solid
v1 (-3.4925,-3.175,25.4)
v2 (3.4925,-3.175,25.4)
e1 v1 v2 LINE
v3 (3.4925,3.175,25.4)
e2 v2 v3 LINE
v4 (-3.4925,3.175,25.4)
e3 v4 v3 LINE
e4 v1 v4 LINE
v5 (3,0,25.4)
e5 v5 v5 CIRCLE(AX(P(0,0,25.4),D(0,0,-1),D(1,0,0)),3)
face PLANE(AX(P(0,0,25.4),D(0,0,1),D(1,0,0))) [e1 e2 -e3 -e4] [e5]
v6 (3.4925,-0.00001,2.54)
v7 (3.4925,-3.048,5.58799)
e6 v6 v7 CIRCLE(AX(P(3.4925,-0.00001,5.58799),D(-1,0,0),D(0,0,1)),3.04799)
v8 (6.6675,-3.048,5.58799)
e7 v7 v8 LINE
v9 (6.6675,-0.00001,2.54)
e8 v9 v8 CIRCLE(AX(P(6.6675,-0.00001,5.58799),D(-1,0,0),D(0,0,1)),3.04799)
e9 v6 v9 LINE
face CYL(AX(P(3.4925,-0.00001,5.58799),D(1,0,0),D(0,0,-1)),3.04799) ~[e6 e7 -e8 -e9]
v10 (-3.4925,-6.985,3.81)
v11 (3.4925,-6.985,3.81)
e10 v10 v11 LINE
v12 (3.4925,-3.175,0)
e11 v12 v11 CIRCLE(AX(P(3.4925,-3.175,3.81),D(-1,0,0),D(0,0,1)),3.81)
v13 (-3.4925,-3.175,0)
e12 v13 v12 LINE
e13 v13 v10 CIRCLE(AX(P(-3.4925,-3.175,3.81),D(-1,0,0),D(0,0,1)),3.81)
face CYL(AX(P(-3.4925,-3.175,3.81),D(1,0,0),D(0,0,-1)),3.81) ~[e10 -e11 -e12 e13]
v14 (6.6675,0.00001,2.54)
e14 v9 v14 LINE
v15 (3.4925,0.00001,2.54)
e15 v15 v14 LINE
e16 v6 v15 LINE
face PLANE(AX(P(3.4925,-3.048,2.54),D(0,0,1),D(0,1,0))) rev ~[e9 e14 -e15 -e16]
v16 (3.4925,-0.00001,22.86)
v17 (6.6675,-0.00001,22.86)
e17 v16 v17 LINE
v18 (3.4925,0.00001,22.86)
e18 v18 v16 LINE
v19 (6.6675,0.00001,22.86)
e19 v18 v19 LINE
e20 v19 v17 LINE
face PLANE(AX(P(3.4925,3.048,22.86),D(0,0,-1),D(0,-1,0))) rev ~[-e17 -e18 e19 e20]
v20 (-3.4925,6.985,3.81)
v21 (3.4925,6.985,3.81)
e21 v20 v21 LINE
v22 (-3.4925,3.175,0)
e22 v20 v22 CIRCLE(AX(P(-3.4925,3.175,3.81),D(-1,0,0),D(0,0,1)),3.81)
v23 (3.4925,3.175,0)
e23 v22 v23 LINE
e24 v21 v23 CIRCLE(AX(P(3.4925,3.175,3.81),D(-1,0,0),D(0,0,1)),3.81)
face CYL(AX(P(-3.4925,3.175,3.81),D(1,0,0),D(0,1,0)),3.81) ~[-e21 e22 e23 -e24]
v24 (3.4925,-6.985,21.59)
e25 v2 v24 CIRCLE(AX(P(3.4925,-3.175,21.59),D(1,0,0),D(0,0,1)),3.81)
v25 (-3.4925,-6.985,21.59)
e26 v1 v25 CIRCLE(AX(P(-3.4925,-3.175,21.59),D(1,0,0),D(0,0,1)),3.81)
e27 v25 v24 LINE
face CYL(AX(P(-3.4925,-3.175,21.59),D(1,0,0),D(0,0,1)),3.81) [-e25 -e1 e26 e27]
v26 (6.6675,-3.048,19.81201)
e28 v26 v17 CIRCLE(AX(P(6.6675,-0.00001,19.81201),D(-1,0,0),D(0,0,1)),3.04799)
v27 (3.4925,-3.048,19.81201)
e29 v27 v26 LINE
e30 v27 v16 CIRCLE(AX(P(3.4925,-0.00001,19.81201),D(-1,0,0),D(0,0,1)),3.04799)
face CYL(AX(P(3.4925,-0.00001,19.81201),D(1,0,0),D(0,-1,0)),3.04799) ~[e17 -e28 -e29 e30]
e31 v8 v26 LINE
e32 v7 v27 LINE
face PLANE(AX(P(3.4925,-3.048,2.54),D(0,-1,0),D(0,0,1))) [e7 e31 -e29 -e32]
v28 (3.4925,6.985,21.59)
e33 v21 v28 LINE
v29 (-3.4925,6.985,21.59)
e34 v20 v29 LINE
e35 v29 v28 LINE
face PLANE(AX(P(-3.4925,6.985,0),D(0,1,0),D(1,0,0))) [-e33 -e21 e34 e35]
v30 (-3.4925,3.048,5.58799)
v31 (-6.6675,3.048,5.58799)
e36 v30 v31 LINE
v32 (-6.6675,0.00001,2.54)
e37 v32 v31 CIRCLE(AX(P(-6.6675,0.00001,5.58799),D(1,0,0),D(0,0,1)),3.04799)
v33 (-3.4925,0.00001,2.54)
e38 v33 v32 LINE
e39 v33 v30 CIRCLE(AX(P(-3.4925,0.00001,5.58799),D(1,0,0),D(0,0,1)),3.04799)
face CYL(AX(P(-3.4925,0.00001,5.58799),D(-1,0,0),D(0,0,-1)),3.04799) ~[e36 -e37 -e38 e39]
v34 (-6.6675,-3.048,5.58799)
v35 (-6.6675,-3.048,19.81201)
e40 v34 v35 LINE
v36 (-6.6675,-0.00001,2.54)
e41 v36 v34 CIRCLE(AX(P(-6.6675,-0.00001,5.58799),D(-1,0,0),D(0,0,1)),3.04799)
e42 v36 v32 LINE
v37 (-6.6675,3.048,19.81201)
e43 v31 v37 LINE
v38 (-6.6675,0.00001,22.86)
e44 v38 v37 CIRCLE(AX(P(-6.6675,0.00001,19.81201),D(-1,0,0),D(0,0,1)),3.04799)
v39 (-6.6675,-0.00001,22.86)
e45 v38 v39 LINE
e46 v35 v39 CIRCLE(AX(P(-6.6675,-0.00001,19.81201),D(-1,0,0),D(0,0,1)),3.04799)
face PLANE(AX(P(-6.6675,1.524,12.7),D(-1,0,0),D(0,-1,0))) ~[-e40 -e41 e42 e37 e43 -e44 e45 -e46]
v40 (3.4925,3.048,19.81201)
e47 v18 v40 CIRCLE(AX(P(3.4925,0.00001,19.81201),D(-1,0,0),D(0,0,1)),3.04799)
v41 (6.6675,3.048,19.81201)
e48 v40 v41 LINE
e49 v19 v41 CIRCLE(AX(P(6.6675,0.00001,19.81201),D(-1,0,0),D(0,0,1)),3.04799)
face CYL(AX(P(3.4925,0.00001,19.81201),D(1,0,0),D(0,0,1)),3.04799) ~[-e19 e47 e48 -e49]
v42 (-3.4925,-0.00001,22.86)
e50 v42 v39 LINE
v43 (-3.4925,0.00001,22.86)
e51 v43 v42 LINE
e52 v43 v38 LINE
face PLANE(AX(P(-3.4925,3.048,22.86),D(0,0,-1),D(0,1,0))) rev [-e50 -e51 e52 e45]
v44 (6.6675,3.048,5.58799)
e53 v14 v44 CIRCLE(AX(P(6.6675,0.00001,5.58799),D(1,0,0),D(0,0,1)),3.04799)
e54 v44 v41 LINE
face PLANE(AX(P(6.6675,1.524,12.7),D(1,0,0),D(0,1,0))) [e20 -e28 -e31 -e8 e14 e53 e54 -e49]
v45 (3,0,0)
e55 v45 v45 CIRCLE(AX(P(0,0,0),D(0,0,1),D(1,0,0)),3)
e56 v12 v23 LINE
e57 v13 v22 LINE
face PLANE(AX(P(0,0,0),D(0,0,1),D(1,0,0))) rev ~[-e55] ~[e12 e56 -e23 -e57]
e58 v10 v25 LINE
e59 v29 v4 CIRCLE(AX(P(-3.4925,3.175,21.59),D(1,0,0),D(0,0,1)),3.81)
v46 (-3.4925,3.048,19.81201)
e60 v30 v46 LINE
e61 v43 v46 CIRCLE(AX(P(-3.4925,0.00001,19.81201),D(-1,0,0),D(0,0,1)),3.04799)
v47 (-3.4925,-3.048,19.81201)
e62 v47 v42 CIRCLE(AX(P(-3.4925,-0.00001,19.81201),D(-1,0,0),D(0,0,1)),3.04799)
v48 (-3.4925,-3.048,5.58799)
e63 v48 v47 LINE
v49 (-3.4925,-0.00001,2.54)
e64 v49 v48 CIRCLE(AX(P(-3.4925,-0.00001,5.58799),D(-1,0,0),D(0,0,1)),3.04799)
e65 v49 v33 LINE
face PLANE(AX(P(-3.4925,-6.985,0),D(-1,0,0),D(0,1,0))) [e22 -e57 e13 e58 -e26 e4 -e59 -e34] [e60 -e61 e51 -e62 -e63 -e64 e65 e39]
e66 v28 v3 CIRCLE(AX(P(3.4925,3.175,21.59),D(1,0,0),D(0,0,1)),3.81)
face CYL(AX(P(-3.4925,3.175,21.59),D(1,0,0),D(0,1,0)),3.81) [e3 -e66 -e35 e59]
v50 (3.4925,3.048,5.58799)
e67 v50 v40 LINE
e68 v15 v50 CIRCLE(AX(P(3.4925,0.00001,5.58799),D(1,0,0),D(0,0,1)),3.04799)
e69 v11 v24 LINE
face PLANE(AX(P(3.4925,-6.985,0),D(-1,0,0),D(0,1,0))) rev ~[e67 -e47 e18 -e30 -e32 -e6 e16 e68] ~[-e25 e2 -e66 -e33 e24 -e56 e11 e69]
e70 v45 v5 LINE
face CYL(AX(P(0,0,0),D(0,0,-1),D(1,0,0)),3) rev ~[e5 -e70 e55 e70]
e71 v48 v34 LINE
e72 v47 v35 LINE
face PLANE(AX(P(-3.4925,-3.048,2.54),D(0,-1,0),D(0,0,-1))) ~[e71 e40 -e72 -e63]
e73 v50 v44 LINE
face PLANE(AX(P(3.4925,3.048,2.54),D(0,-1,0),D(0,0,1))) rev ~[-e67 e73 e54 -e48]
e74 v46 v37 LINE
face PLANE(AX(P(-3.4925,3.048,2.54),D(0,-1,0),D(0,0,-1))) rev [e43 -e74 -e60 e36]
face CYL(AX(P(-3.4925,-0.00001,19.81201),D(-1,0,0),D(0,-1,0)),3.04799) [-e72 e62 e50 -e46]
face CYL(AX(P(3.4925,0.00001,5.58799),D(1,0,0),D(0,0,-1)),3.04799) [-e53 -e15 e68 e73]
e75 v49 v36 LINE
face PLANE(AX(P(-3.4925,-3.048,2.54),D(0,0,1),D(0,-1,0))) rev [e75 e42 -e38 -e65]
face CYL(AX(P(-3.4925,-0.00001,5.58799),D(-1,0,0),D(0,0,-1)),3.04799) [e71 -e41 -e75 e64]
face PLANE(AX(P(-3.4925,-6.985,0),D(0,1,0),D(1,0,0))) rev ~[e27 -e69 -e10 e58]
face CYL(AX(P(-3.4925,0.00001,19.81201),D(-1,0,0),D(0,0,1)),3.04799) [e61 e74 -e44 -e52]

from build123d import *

# Parameters (mm, degrees)
F0_W     = 6.985
F0_H     = 13.97
F1_DEPTH = 25.4
F2_R     = 3
F3_DEPTH = 25.4
F4_W     = 3.048
F4_H     = 20.32
F5_DEPTH = 3.175
F6_R     = 3.04799
F8_R     = 3.81


# Not quite as in the source:
# - a fillet or chamfer is up to 0.001 mm smaller than in the source, because OpenCascade refuses the exact size


with BuildPart() as f1:
    # F0 (on Top) → F1 (new body)
    with BuildSketch(Plane.XY):
        Rectangle(F0_W, F0_H)
    extrude(amount=F1_DEPTH)

    # F2 (on face) → F3 (cut)
    with BuildSketch(Plane(origin=(0, 0, 0), x_dir=(1, 0, 0), z_dir=(0, 0, -1))):
        Circle(F2_R)
    extrude(amount=-F3_DEPTH, mode=Mode.SUBTRACT)

    # F4 (on face) → F5 (join)
    with BuildSketch(Plane.YZ.offset(3.4925)):
        with Locations((1.524, 12.7)):
            Rectangle(F4_W, F4_H)
        with Locations((-1.524, 12.7)):
            Rectangle(F4_W, F4_H)
    extrude(amount=F5_DEPTH)

    # F6 (radius 3.048 in the source; OpenCascade refuses exactly that, so slightly less here)
    f6_edges = [f1.edges().sort_by_distance(p)[0] for p in [
        (5.08, -3.048, 22.86),
        (5.08, 3.048, 22.86),
        (5.08, 3.048, 2.54),
        (5.08, -3.048, 2.54),
    ]]
    fillet(f6_edges, radius=F6_R)

    # F7: F1 across plane


with BuildPart() as f1_1:
    add(f1.part)
    add(f1.part.mirror(Plane.YZ))

    # F8
    f8_edges = [f1_1.edges().sort_by_distance(p)[0] for p in [
        (0, -6.985, 0),
        (0, 6.985, 0),
        (0, 6.985, 25.4),
        (0, -6.985, 25.4),
    ]]
    fillet(f8_edges, radius=F8_R)


solid = f1_1.part
